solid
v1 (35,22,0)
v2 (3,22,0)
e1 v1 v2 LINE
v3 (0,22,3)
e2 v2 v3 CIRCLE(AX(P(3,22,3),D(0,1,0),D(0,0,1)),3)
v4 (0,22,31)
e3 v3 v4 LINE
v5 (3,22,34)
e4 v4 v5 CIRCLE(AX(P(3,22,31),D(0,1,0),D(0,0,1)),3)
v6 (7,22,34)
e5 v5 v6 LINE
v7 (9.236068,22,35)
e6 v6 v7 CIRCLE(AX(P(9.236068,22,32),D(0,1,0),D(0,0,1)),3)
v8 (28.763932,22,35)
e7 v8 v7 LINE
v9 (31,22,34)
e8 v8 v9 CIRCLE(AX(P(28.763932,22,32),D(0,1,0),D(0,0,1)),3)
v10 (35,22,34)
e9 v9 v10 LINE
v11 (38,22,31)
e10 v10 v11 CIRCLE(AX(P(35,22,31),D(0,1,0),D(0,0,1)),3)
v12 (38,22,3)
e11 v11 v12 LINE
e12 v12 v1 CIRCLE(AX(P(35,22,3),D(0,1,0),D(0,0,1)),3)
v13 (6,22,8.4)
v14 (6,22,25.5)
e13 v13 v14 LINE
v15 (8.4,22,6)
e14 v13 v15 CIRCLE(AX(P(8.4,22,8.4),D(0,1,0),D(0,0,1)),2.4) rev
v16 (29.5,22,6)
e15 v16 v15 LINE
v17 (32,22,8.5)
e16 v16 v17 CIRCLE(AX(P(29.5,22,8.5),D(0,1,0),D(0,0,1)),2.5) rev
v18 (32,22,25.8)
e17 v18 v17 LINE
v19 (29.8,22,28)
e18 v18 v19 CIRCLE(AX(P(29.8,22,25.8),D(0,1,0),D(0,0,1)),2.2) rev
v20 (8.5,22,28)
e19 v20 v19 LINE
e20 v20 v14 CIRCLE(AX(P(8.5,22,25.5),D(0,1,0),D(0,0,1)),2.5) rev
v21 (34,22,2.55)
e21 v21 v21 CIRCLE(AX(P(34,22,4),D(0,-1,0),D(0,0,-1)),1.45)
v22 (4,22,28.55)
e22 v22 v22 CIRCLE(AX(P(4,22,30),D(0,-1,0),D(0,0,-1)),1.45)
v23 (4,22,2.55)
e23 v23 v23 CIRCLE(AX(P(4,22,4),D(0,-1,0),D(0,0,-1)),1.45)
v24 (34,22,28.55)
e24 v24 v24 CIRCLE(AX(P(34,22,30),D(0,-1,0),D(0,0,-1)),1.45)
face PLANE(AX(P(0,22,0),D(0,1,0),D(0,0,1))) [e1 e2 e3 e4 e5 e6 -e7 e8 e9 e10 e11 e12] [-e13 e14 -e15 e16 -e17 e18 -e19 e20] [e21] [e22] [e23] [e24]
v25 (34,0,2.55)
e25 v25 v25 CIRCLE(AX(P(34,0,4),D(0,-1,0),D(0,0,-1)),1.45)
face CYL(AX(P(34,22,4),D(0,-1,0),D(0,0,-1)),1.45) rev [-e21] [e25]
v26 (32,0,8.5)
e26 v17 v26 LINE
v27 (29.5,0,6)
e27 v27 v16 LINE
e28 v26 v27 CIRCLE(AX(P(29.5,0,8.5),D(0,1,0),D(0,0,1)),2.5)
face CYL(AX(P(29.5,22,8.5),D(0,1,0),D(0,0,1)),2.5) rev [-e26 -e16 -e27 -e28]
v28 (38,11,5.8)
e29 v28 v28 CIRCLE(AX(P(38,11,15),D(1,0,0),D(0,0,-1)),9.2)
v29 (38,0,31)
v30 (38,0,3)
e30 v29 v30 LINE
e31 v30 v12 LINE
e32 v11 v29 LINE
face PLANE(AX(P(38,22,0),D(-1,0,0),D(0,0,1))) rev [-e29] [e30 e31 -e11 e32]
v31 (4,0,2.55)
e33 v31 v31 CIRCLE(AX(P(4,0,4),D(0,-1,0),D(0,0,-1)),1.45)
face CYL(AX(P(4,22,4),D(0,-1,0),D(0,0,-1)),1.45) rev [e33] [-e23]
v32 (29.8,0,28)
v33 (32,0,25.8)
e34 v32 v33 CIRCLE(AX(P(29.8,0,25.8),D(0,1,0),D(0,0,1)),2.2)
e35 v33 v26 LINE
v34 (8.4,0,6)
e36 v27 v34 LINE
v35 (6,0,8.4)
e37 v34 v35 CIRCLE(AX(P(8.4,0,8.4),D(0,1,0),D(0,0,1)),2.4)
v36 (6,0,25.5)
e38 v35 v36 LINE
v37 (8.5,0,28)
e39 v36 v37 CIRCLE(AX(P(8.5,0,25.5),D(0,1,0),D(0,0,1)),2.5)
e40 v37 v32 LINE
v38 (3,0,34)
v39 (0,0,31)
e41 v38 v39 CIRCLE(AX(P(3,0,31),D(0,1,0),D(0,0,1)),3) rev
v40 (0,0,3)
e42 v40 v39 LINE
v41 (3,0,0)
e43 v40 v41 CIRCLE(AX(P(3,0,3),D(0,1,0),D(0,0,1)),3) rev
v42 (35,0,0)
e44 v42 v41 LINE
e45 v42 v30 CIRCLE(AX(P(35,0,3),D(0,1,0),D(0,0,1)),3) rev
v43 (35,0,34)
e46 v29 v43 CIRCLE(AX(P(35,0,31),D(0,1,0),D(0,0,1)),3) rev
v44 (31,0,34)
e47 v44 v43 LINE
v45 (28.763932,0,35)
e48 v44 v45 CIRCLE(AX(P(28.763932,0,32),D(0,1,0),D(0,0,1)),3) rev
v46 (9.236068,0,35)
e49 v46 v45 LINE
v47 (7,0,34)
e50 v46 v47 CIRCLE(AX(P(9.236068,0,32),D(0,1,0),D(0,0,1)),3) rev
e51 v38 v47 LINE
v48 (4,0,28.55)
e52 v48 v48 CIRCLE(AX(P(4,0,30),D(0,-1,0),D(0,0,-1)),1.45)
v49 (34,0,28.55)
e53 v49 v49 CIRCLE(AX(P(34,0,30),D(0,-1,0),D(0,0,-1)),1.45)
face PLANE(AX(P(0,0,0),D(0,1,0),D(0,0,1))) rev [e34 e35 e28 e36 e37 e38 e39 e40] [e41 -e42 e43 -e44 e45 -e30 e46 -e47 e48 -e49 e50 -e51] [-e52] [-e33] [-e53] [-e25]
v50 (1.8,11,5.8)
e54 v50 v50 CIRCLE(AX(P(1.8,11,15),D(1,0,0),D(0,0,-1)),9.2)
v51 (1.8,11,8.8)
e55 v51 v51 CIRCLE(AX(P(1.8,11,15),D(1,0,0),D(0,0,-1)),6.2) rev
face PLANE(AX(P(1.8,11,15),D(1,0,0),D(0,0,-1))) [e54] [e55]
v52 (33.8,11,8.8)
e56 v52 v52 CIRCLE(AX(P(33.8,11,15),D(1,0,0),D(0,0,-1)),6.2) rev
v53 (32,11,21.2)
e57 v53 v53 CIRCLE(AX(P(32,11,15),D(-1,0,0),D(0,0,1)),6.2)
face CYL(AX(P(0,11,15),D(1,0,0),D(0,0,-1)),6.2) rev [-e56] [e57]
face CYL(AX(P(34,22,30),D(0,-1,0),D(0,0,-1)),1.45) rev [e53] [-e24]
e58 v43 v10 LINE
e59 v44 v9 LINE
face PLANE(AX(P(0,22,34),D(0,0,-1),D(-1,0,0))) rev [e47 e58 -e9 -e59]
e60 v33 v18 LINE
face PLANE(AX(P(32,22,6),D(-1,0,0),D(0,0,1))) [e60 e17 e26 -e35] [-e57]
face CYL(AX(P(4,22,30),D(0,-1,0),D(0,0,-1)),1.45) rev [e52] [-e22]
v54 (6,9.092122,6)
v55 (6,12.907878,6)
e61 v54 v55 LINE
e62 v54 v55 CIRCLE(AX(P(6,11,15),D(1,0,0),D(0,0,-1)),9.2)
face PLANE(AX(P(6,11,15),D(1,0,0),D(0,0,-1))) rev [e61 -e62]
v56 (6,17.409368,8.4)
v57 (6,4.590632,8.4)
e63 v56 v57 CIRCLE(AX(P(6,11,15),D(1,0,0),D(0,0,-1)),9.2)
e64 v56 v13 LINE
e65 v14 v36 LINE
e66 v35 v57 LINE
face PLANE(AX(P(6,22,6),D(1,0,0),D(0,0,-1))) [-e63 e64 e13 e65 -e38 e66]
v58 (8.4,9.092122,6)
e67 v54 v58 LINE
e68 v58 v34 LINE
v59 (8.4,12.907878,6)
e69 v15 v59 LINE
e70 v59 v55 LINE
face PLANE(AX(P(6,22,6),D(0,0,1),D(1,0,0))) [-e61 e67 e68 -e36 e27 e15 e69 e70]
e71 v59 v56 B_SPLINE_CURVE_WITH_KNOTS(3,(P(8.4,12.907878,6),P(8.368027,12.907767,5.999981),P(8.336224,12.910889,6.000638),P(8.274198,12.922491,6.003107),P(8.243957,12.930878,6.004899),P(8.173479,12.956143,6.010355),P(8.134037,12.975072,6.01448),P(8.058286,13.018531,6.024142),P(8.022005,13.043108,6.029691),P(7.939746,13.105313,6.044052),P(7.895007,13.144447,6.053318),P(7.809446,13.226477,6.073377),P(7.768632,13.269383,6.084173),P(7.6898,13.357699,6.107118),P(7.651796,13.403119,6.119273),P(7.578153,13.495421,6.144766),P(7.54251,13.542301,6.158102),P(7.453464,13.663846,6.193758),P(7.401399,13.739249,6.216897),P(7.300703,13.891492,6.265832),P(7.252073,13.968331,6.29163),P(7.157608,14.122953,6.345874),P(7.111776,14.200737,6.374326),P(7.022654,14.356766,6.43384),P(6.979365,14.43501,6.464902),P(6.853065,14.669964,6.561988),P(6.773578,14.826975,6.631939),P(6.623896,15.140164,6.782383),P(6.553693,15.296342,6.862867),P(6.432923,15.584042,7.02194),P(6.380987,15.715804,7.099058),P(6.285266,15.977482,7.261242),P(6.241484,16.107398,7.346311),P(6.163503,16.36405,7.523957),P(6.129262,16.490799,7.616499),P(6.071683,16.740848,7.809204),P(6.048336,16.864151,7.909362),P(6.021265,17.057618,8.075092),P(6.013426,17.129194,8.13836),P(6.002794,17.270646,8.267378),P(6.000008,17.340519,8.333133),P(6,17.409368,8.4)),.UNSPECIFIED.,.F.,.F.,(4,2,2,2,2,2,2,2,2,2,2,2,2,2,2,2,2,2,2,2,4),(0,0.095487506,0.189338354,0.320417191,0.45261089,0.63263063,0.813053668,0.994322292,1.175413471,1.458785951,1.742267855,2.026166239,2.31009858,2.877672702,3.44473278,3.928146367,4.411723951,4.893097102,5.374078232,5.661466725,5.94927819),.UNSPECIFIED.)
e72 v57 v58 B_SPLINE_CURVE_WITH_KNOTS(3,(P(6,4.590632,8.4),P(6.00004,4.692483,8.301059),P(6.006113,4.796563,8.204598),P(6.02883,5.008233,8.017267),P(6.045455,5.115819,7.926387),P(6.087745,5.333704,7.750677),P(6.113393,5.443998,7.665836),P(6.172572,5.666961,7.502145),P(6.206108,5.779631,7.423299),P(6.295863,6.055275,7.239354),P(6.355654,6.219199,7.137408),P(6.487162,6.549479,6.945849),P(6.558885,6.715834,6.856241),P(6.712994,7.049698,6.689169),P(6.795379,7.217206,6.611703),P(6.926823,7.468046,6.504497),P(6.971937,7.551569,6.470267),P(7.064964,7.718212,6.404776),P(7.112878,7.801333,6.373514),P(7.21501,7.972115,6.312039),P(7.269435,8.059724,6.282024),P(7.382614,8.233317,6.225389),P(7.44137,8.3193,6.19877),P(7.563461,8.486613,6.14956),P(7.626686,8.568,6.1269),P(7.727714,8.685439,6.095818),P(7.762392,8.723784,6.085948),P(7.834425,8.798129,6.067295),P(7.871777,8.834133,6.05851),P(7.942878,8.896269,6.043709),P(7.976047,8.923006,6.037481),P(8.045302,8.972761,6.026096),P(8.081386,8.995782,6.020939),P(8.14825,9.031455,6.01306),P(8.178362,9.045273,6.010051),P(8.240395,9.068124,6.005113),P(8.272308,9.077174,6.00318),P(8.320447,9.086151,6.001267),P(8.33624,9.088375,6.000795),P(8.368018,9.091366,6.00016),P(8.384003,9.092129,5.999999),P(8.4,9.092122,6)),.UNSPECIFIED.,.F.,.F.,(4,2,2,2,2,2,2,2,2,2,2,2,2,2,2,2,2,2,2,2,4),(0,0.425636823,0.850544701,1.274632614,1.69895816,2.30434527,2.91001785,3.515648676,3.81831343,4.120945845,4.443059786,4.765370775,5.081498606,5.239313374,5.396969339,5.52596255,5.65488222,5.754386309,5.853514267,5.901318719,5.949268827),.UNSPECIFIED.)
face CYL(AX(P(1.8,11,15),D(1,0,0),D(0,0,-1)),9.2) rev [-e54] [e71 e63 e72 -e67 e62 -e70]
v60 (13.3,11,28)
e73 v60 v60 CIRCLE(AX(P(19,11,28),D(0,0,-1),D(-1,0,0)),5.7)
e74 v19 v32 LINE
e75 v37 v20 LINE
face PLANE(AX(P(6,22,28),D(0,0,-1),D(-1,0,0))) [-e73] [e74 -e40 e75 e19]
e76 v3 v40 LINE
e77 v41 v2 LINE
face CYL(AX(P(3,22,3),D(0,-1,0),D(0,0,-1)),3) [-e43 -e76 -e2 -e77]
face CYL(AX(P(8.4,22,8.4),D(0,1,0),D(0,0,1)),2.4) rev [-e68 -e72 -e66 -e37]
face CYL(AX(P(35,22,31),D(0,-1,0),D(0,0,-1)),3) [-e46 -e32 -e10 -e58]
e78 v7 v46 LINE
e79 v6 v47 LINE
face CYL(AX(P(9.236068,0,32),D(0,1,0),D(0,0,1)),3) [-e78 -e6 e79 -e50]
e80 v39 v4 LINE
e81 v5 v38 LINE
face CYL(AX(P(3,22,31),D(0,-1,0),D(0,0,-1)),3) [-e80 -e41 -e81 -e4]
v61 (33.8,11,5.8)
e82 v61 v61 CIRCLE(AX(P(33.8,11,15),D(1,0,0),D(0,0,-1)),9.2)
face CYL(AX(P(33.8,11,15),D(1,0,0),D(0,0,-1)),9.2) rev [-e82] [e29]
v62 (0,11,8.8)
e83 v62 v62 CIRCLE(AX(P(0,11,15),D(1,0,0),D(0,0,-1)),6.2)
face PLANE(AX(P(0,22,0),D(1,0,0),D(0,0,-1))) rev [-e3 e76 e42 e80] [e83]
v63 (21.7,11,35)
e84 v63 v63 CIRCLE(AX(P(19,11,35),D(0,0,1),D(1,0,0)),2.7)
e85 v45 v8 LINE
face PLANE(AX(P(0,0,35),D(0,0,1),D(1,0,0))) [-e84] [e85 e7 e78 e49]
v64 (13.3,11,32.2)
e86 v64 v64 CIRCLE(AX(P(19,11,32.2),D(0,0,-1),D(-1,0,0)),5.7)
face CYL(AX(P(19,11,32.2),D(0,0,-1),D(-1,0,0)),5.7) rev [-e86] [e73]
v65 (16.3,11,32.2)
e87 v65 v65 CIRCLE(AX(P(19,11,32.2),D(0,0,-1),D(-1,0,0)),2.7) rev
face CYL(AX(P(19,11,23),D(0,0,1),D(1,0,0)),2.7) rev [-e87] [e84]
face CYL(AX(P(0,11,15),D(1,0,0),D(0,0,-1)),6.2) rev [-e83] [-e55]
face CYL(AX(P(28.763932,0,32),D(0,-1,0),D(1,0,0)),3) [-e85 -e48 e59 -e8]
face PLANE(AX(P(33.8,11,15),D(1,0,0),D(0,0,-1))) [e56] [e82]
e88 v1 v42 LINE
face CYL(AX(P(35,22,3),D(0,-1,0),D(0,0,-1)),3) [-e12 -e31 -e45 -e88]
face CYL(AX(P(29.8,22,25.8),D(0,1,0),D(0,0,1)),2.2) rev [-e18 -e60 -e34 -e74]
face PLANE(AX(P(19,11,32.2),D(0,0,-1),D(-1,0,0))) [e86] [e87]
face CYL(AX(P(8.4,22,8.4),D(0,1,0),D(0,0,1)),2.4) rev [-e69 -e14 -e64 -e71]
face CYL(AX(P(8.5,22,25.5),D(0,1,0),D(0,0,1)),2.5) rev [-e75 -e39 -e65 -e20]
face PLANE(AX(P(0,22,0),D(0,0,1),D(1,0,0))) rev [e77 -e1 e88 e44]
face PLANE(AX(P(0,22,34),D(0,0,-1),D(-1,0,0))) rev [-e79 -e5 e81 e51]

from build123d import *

# Parameters (mm, degrees)
SKETCH3_W           = 38
SKETCH3_H           = 34
SKETCH3_W_2         = 26
SKETCH3_H_2         = 22
BOSS_EXTRUDE1_DEPTH = 22
SKETCH4_W           = 24
SKETCH4_H           = 22
BOSS_EXTRUDE2_DEPTH = 1
SKETCH5_R           = 2.7
CUT_EXTRUDE1_DEPTH  = 12
SKETCH7_R           = 5.7
CUT_EXTRUDE3_DEPTH  = 4.2
SKETCH8_R           = 6.2
CUT_EXTRUDE4_DEPTH  = 57.151580565
SKETCH9_R           = 9.2
CUT_EXTRUDE5_DEPTH  = 4.2
SKETCH10_R          = 9.2
CUT_EXTRUDE6_DEPTH  = 4.2
SKETCH15_R          = 1.45
CUT_EXTRUDE7_DEPTH  = 57.151580565
FILLET1_R           = 3
FILLET3_R           = 2.5
FILLET4_R           = 2.2
FILLET5_R           = 2.4


with BuildPart() as part:
    # Sketch3 → Boss-Extrude1 (new body)
    with BuildSketch(Plane(origin=(0, 0, 0), x_dir=(1, 0, 0), z_dir=(0, 1, 0))):
        with Locations((19, -17)):
            Rectangle(SKETCH3_W, SKETCH3_H)
        with Locations((19, -17)):
            Rectangle(SKETCH3_W_2, SKETCH3_H_2, mode=Mode.SUBTRACT)
    extrude(amount=BOSS_EXTRUDE1_DEPTH)

    # Sketch4 → Boss-Extrude2 (add)
    with BuildSketch(Plane.XY.offset(34)):
        with Locations((19, 11)):
            Rectangle(SKETCH4_W, SKETCH4_H)
    extrude(amount=BOSS_EXTRUDE2_DEPTH)

    # Sketch5 → Cut-Extrude1 (cut)
    with BuildSketch(Plane.XY.offset(35)):
        with Locations((19, 11)):
            Circle(SKETCH5_R)
    extrude(amount=-CUT_EXTRUDE1_DEPTH, mode=Mode.SUBTRACT)

    # Sketch7 → Cut-Extrude3 (cut)
    with BuildSketch(Plane(origin=(0, 0, 28), x_dir=(-1, 0, 0), z_dir=(0, 0, -1))):
        with Locations((-19, 11)):
            Circle(SKETCH7_R)
    extrude(amount=-CUT_EXTRUDE3_DEPTH, mode=Mode.SUBTRACT)

    # Sketch8 → Cut-Extrude4 (cut, through all)
    with BuildSketch(Plane(origin=(38, 0, 0), x_dir=(0, 0, -1), z_dir=(1, 0, 0))):
        with Locations((-15, 11)):
            Circle(SKETCH8_R)
    extrude(amount=-CUT_EXTRUDE4_DEPTH, mode=Mode.SUBTRACT)

    # Sketch9 → Cut-Extrude5 (cut)
    with BuildSketch(Plane(origin=(6, 0, 0), x_dir=(0, 0, -1), z_dir=(1, 0, 0))):
        with Locations((-15, 11)):
            Circle(SKETCH9_R)
    extrude(amount=-CUT_EXTRUDE5_DEPTH, mode=Mode.SUBTRACT)

    # Sketch10 → Cut-Extrude6 (cut)
    with BuildSketch(Plane(origin=(38, 0, 0), x_dir=(0, 0, -1), z_dir=(1, 0, 0))):
        with Locations((-15, 11)):
            Circle(SKETCH10_R)
    extrude(amount=-CUT_EXTRUDE6_DEPTH, mode=Mode.SUBTRACT)

    # Sketch15 → Cut-Extrude7 (cut, through all)
    with BuildSketch(Plane(origin=(0, 0, 0), x_dir=(-1, 0, 0), z_dir=(0, -1, 0))):
        with Locations(Location((-4, -30, 0), (0, 0, 90))):
            Circle(SKETCH15_R)
        with Locations(Location((-34, -30, 0), (0, 0, 90))):
            Circle(SKETCH15_R)
        with Locations(Location((-34, -4, 0), (0, 0, 90))):
            Circle(SKETCH15_R)
        with Locations(Location((-4, -4, 0), (0, 0, 90))):
            Circle(SKETCH15_R)
    extrude(amount=-CUT_EXTRUDE7_DEPTH, mode=Mode.SUBTRACT)

    # Fillet1
    # the kernel refuses this fillet: 3 mm, written as the material it takes off along each edge
    with BuildSketch(Plane(origin=(38, -7.5, 0), x_dir=(-1, 0, 0), z_dir=(0, 1, 0)), Plane(origin=(38, -7.5, 34), x_dir=(0, 0, -1), z_dir=(0, 1, 0))) as fillet1_piece_1:
        with BuildLine():
            CenterArc((FILLET1_R, FILLET1_R), FILLET1_R, 180, 90)
            Line((0, FILLET1_R), (-FILLET1_R * 0.02, FILLET1_R))
            Line((-FILLET1_R * 0.02, FILLET1_R), (-FILLET1_R * 0.02, -FILLET1_R * 0.02))
            Line((-FILLET1_R * 0.02, -FILLET1_R * 0.02), (FILLET1_R, -FILLET1_R * 0.02))
            Line((FILLET1_R, -FILLET1_R * 0.02), (FILLET1_R, 0))
        make_face()
    extrude(amount=37, mode=Mode.SUBTRACT)
    with BuildSketch(Plane(origin=(7, -5.590169944, 35), x_dir=(0, 0, -1), z_dir=(0, 1, 0)), Plane(origin=(31, 27.590169944, 35), x_dir=(0, 0, -1), z_dir=(0, -1, 0))) as fillet1_piece_2:
        with BuildLine():
            CenterArc((3, -2.236067977), FILLET1_R, 131.810314896, 48.189685104)
            Line((0, -2.236067977), (-0.06, -2.236067977))
            Line((-0.06, -2.236067977), (-0.06, 0))
            Line((-0.06, 0), (0, 0.06))
            ThreePointArc((0, 0.06), (0.5, 0.06), (0.96, 0.04472136))
            Line((0.96, 0.04472136), (1, 0))
        make_face()
    extrude(amount=33.180339887, mode=Mode.SUBTRACT)
    with BuildSketch(Plane(origin=(0, -7.5, 34), x_dir=(0, 0, -1), z_dir=(0, 1, 0)), Plane(origin=(0, -7.5, 0), x_dir=(1, 0, 0), z_dir=(0, 1, 0))) as fillet1_piece_3:
        with BuildLine():
            CenterArc((FILLET1_R, -FILLET1_R), FILLET1_R, 90, 90)
            Line((0, -FILLET1_R), (-FILLET1_R * 0.02, -FILLET1_R))
            Line((-FILLET1_R * 0.02, -FILLET1_R), (-FILLET1_R * 0.02, FILLET1_R * 0.02))
            Line((-FILLET1_R * 0.02, FILLET1_R * 0.02), (FILLET1_R, FILLET1_R * 0.02))
            Line((FILLET1_R, FILLET1_R * 0.02), (FILLET1_R, 0))
        make_face()
    extrude(amount=37, mode=Mode.SUBTRACT)

    # Fillet3
    fillet3_edges = [part.edges().sort_by_distance(p)[0] for p in [
        (6, 11, 28),
        (32, 11, 6),
    ]]
    fillet(fillet3_edges, radius=FILLET3_R)

    # Fillet4
    fillet4_edges = [part.edges().sort_by_distance(p)[0] for p in [
        (32, 11, 28),
    ]]
    fillet(fillet4_edges, radius=FILLET4_R)

    # Fillet5
    # the kernel refuses this fillet: 2.4 mm, written as the material it adds along each edge
    with BuildSketch(Plane(origin=(6, 6.907878403, 6), x_dir=(0, 0, 1), z_dir=(0, 1, 0))) as fillet5_piece_1_section:
        with BuildLine():
            CenterArc((FILLET5_R, FILLET5_R), FILLET5_R, 180, 90)
            Line((0, FILLET5_R), (0, 0))
            Line((0, 0), (FILLET5_R, 0))
        make_face()
    fillet5_piece_1 = extrude(amount=15.092121597, mode=Mode.PRIVATE)
    fillet5_piece_1 = fillet5_piece_1 - Plane(origin=(6.778295216, 11, 15), x_dir=(0, 0, -1), z_dir=(1, 0, 0)) * Cylinder(9.2, 40, mode=Mode.PRIVATE)
    add(fillet5_piece_1)
    with BuildSketch(Plane(origin=(6, 0, 6), x_dir=(0, 0, 1), z_dir=(0, 1, 0))) as fillet5_piece_2_section:
        with BuildLine():
            CenterArc((FILLET5_R, FILLET5_R), FILLET5_R, 180, 90)
            Line((0, FILLET5_R), (0, 0))
            Line((0, 0), (FILLET5_R, 0))
        make_face()
    fillet5_piece_2 = extrude(amount=15.092121597, mode=Mode.PRIVATE)
    fillet5_piece_2 = fillet5_piece_2 - Plane(origin=(6.572967992, 11, 15), x_dir=(0, 0, -1), z_dir=(1, 0, 0)) * Cylinder(9.2, 40, mode=Mode.PRIVATE)
    add(fillet5_piece_2)


solid = part.part
